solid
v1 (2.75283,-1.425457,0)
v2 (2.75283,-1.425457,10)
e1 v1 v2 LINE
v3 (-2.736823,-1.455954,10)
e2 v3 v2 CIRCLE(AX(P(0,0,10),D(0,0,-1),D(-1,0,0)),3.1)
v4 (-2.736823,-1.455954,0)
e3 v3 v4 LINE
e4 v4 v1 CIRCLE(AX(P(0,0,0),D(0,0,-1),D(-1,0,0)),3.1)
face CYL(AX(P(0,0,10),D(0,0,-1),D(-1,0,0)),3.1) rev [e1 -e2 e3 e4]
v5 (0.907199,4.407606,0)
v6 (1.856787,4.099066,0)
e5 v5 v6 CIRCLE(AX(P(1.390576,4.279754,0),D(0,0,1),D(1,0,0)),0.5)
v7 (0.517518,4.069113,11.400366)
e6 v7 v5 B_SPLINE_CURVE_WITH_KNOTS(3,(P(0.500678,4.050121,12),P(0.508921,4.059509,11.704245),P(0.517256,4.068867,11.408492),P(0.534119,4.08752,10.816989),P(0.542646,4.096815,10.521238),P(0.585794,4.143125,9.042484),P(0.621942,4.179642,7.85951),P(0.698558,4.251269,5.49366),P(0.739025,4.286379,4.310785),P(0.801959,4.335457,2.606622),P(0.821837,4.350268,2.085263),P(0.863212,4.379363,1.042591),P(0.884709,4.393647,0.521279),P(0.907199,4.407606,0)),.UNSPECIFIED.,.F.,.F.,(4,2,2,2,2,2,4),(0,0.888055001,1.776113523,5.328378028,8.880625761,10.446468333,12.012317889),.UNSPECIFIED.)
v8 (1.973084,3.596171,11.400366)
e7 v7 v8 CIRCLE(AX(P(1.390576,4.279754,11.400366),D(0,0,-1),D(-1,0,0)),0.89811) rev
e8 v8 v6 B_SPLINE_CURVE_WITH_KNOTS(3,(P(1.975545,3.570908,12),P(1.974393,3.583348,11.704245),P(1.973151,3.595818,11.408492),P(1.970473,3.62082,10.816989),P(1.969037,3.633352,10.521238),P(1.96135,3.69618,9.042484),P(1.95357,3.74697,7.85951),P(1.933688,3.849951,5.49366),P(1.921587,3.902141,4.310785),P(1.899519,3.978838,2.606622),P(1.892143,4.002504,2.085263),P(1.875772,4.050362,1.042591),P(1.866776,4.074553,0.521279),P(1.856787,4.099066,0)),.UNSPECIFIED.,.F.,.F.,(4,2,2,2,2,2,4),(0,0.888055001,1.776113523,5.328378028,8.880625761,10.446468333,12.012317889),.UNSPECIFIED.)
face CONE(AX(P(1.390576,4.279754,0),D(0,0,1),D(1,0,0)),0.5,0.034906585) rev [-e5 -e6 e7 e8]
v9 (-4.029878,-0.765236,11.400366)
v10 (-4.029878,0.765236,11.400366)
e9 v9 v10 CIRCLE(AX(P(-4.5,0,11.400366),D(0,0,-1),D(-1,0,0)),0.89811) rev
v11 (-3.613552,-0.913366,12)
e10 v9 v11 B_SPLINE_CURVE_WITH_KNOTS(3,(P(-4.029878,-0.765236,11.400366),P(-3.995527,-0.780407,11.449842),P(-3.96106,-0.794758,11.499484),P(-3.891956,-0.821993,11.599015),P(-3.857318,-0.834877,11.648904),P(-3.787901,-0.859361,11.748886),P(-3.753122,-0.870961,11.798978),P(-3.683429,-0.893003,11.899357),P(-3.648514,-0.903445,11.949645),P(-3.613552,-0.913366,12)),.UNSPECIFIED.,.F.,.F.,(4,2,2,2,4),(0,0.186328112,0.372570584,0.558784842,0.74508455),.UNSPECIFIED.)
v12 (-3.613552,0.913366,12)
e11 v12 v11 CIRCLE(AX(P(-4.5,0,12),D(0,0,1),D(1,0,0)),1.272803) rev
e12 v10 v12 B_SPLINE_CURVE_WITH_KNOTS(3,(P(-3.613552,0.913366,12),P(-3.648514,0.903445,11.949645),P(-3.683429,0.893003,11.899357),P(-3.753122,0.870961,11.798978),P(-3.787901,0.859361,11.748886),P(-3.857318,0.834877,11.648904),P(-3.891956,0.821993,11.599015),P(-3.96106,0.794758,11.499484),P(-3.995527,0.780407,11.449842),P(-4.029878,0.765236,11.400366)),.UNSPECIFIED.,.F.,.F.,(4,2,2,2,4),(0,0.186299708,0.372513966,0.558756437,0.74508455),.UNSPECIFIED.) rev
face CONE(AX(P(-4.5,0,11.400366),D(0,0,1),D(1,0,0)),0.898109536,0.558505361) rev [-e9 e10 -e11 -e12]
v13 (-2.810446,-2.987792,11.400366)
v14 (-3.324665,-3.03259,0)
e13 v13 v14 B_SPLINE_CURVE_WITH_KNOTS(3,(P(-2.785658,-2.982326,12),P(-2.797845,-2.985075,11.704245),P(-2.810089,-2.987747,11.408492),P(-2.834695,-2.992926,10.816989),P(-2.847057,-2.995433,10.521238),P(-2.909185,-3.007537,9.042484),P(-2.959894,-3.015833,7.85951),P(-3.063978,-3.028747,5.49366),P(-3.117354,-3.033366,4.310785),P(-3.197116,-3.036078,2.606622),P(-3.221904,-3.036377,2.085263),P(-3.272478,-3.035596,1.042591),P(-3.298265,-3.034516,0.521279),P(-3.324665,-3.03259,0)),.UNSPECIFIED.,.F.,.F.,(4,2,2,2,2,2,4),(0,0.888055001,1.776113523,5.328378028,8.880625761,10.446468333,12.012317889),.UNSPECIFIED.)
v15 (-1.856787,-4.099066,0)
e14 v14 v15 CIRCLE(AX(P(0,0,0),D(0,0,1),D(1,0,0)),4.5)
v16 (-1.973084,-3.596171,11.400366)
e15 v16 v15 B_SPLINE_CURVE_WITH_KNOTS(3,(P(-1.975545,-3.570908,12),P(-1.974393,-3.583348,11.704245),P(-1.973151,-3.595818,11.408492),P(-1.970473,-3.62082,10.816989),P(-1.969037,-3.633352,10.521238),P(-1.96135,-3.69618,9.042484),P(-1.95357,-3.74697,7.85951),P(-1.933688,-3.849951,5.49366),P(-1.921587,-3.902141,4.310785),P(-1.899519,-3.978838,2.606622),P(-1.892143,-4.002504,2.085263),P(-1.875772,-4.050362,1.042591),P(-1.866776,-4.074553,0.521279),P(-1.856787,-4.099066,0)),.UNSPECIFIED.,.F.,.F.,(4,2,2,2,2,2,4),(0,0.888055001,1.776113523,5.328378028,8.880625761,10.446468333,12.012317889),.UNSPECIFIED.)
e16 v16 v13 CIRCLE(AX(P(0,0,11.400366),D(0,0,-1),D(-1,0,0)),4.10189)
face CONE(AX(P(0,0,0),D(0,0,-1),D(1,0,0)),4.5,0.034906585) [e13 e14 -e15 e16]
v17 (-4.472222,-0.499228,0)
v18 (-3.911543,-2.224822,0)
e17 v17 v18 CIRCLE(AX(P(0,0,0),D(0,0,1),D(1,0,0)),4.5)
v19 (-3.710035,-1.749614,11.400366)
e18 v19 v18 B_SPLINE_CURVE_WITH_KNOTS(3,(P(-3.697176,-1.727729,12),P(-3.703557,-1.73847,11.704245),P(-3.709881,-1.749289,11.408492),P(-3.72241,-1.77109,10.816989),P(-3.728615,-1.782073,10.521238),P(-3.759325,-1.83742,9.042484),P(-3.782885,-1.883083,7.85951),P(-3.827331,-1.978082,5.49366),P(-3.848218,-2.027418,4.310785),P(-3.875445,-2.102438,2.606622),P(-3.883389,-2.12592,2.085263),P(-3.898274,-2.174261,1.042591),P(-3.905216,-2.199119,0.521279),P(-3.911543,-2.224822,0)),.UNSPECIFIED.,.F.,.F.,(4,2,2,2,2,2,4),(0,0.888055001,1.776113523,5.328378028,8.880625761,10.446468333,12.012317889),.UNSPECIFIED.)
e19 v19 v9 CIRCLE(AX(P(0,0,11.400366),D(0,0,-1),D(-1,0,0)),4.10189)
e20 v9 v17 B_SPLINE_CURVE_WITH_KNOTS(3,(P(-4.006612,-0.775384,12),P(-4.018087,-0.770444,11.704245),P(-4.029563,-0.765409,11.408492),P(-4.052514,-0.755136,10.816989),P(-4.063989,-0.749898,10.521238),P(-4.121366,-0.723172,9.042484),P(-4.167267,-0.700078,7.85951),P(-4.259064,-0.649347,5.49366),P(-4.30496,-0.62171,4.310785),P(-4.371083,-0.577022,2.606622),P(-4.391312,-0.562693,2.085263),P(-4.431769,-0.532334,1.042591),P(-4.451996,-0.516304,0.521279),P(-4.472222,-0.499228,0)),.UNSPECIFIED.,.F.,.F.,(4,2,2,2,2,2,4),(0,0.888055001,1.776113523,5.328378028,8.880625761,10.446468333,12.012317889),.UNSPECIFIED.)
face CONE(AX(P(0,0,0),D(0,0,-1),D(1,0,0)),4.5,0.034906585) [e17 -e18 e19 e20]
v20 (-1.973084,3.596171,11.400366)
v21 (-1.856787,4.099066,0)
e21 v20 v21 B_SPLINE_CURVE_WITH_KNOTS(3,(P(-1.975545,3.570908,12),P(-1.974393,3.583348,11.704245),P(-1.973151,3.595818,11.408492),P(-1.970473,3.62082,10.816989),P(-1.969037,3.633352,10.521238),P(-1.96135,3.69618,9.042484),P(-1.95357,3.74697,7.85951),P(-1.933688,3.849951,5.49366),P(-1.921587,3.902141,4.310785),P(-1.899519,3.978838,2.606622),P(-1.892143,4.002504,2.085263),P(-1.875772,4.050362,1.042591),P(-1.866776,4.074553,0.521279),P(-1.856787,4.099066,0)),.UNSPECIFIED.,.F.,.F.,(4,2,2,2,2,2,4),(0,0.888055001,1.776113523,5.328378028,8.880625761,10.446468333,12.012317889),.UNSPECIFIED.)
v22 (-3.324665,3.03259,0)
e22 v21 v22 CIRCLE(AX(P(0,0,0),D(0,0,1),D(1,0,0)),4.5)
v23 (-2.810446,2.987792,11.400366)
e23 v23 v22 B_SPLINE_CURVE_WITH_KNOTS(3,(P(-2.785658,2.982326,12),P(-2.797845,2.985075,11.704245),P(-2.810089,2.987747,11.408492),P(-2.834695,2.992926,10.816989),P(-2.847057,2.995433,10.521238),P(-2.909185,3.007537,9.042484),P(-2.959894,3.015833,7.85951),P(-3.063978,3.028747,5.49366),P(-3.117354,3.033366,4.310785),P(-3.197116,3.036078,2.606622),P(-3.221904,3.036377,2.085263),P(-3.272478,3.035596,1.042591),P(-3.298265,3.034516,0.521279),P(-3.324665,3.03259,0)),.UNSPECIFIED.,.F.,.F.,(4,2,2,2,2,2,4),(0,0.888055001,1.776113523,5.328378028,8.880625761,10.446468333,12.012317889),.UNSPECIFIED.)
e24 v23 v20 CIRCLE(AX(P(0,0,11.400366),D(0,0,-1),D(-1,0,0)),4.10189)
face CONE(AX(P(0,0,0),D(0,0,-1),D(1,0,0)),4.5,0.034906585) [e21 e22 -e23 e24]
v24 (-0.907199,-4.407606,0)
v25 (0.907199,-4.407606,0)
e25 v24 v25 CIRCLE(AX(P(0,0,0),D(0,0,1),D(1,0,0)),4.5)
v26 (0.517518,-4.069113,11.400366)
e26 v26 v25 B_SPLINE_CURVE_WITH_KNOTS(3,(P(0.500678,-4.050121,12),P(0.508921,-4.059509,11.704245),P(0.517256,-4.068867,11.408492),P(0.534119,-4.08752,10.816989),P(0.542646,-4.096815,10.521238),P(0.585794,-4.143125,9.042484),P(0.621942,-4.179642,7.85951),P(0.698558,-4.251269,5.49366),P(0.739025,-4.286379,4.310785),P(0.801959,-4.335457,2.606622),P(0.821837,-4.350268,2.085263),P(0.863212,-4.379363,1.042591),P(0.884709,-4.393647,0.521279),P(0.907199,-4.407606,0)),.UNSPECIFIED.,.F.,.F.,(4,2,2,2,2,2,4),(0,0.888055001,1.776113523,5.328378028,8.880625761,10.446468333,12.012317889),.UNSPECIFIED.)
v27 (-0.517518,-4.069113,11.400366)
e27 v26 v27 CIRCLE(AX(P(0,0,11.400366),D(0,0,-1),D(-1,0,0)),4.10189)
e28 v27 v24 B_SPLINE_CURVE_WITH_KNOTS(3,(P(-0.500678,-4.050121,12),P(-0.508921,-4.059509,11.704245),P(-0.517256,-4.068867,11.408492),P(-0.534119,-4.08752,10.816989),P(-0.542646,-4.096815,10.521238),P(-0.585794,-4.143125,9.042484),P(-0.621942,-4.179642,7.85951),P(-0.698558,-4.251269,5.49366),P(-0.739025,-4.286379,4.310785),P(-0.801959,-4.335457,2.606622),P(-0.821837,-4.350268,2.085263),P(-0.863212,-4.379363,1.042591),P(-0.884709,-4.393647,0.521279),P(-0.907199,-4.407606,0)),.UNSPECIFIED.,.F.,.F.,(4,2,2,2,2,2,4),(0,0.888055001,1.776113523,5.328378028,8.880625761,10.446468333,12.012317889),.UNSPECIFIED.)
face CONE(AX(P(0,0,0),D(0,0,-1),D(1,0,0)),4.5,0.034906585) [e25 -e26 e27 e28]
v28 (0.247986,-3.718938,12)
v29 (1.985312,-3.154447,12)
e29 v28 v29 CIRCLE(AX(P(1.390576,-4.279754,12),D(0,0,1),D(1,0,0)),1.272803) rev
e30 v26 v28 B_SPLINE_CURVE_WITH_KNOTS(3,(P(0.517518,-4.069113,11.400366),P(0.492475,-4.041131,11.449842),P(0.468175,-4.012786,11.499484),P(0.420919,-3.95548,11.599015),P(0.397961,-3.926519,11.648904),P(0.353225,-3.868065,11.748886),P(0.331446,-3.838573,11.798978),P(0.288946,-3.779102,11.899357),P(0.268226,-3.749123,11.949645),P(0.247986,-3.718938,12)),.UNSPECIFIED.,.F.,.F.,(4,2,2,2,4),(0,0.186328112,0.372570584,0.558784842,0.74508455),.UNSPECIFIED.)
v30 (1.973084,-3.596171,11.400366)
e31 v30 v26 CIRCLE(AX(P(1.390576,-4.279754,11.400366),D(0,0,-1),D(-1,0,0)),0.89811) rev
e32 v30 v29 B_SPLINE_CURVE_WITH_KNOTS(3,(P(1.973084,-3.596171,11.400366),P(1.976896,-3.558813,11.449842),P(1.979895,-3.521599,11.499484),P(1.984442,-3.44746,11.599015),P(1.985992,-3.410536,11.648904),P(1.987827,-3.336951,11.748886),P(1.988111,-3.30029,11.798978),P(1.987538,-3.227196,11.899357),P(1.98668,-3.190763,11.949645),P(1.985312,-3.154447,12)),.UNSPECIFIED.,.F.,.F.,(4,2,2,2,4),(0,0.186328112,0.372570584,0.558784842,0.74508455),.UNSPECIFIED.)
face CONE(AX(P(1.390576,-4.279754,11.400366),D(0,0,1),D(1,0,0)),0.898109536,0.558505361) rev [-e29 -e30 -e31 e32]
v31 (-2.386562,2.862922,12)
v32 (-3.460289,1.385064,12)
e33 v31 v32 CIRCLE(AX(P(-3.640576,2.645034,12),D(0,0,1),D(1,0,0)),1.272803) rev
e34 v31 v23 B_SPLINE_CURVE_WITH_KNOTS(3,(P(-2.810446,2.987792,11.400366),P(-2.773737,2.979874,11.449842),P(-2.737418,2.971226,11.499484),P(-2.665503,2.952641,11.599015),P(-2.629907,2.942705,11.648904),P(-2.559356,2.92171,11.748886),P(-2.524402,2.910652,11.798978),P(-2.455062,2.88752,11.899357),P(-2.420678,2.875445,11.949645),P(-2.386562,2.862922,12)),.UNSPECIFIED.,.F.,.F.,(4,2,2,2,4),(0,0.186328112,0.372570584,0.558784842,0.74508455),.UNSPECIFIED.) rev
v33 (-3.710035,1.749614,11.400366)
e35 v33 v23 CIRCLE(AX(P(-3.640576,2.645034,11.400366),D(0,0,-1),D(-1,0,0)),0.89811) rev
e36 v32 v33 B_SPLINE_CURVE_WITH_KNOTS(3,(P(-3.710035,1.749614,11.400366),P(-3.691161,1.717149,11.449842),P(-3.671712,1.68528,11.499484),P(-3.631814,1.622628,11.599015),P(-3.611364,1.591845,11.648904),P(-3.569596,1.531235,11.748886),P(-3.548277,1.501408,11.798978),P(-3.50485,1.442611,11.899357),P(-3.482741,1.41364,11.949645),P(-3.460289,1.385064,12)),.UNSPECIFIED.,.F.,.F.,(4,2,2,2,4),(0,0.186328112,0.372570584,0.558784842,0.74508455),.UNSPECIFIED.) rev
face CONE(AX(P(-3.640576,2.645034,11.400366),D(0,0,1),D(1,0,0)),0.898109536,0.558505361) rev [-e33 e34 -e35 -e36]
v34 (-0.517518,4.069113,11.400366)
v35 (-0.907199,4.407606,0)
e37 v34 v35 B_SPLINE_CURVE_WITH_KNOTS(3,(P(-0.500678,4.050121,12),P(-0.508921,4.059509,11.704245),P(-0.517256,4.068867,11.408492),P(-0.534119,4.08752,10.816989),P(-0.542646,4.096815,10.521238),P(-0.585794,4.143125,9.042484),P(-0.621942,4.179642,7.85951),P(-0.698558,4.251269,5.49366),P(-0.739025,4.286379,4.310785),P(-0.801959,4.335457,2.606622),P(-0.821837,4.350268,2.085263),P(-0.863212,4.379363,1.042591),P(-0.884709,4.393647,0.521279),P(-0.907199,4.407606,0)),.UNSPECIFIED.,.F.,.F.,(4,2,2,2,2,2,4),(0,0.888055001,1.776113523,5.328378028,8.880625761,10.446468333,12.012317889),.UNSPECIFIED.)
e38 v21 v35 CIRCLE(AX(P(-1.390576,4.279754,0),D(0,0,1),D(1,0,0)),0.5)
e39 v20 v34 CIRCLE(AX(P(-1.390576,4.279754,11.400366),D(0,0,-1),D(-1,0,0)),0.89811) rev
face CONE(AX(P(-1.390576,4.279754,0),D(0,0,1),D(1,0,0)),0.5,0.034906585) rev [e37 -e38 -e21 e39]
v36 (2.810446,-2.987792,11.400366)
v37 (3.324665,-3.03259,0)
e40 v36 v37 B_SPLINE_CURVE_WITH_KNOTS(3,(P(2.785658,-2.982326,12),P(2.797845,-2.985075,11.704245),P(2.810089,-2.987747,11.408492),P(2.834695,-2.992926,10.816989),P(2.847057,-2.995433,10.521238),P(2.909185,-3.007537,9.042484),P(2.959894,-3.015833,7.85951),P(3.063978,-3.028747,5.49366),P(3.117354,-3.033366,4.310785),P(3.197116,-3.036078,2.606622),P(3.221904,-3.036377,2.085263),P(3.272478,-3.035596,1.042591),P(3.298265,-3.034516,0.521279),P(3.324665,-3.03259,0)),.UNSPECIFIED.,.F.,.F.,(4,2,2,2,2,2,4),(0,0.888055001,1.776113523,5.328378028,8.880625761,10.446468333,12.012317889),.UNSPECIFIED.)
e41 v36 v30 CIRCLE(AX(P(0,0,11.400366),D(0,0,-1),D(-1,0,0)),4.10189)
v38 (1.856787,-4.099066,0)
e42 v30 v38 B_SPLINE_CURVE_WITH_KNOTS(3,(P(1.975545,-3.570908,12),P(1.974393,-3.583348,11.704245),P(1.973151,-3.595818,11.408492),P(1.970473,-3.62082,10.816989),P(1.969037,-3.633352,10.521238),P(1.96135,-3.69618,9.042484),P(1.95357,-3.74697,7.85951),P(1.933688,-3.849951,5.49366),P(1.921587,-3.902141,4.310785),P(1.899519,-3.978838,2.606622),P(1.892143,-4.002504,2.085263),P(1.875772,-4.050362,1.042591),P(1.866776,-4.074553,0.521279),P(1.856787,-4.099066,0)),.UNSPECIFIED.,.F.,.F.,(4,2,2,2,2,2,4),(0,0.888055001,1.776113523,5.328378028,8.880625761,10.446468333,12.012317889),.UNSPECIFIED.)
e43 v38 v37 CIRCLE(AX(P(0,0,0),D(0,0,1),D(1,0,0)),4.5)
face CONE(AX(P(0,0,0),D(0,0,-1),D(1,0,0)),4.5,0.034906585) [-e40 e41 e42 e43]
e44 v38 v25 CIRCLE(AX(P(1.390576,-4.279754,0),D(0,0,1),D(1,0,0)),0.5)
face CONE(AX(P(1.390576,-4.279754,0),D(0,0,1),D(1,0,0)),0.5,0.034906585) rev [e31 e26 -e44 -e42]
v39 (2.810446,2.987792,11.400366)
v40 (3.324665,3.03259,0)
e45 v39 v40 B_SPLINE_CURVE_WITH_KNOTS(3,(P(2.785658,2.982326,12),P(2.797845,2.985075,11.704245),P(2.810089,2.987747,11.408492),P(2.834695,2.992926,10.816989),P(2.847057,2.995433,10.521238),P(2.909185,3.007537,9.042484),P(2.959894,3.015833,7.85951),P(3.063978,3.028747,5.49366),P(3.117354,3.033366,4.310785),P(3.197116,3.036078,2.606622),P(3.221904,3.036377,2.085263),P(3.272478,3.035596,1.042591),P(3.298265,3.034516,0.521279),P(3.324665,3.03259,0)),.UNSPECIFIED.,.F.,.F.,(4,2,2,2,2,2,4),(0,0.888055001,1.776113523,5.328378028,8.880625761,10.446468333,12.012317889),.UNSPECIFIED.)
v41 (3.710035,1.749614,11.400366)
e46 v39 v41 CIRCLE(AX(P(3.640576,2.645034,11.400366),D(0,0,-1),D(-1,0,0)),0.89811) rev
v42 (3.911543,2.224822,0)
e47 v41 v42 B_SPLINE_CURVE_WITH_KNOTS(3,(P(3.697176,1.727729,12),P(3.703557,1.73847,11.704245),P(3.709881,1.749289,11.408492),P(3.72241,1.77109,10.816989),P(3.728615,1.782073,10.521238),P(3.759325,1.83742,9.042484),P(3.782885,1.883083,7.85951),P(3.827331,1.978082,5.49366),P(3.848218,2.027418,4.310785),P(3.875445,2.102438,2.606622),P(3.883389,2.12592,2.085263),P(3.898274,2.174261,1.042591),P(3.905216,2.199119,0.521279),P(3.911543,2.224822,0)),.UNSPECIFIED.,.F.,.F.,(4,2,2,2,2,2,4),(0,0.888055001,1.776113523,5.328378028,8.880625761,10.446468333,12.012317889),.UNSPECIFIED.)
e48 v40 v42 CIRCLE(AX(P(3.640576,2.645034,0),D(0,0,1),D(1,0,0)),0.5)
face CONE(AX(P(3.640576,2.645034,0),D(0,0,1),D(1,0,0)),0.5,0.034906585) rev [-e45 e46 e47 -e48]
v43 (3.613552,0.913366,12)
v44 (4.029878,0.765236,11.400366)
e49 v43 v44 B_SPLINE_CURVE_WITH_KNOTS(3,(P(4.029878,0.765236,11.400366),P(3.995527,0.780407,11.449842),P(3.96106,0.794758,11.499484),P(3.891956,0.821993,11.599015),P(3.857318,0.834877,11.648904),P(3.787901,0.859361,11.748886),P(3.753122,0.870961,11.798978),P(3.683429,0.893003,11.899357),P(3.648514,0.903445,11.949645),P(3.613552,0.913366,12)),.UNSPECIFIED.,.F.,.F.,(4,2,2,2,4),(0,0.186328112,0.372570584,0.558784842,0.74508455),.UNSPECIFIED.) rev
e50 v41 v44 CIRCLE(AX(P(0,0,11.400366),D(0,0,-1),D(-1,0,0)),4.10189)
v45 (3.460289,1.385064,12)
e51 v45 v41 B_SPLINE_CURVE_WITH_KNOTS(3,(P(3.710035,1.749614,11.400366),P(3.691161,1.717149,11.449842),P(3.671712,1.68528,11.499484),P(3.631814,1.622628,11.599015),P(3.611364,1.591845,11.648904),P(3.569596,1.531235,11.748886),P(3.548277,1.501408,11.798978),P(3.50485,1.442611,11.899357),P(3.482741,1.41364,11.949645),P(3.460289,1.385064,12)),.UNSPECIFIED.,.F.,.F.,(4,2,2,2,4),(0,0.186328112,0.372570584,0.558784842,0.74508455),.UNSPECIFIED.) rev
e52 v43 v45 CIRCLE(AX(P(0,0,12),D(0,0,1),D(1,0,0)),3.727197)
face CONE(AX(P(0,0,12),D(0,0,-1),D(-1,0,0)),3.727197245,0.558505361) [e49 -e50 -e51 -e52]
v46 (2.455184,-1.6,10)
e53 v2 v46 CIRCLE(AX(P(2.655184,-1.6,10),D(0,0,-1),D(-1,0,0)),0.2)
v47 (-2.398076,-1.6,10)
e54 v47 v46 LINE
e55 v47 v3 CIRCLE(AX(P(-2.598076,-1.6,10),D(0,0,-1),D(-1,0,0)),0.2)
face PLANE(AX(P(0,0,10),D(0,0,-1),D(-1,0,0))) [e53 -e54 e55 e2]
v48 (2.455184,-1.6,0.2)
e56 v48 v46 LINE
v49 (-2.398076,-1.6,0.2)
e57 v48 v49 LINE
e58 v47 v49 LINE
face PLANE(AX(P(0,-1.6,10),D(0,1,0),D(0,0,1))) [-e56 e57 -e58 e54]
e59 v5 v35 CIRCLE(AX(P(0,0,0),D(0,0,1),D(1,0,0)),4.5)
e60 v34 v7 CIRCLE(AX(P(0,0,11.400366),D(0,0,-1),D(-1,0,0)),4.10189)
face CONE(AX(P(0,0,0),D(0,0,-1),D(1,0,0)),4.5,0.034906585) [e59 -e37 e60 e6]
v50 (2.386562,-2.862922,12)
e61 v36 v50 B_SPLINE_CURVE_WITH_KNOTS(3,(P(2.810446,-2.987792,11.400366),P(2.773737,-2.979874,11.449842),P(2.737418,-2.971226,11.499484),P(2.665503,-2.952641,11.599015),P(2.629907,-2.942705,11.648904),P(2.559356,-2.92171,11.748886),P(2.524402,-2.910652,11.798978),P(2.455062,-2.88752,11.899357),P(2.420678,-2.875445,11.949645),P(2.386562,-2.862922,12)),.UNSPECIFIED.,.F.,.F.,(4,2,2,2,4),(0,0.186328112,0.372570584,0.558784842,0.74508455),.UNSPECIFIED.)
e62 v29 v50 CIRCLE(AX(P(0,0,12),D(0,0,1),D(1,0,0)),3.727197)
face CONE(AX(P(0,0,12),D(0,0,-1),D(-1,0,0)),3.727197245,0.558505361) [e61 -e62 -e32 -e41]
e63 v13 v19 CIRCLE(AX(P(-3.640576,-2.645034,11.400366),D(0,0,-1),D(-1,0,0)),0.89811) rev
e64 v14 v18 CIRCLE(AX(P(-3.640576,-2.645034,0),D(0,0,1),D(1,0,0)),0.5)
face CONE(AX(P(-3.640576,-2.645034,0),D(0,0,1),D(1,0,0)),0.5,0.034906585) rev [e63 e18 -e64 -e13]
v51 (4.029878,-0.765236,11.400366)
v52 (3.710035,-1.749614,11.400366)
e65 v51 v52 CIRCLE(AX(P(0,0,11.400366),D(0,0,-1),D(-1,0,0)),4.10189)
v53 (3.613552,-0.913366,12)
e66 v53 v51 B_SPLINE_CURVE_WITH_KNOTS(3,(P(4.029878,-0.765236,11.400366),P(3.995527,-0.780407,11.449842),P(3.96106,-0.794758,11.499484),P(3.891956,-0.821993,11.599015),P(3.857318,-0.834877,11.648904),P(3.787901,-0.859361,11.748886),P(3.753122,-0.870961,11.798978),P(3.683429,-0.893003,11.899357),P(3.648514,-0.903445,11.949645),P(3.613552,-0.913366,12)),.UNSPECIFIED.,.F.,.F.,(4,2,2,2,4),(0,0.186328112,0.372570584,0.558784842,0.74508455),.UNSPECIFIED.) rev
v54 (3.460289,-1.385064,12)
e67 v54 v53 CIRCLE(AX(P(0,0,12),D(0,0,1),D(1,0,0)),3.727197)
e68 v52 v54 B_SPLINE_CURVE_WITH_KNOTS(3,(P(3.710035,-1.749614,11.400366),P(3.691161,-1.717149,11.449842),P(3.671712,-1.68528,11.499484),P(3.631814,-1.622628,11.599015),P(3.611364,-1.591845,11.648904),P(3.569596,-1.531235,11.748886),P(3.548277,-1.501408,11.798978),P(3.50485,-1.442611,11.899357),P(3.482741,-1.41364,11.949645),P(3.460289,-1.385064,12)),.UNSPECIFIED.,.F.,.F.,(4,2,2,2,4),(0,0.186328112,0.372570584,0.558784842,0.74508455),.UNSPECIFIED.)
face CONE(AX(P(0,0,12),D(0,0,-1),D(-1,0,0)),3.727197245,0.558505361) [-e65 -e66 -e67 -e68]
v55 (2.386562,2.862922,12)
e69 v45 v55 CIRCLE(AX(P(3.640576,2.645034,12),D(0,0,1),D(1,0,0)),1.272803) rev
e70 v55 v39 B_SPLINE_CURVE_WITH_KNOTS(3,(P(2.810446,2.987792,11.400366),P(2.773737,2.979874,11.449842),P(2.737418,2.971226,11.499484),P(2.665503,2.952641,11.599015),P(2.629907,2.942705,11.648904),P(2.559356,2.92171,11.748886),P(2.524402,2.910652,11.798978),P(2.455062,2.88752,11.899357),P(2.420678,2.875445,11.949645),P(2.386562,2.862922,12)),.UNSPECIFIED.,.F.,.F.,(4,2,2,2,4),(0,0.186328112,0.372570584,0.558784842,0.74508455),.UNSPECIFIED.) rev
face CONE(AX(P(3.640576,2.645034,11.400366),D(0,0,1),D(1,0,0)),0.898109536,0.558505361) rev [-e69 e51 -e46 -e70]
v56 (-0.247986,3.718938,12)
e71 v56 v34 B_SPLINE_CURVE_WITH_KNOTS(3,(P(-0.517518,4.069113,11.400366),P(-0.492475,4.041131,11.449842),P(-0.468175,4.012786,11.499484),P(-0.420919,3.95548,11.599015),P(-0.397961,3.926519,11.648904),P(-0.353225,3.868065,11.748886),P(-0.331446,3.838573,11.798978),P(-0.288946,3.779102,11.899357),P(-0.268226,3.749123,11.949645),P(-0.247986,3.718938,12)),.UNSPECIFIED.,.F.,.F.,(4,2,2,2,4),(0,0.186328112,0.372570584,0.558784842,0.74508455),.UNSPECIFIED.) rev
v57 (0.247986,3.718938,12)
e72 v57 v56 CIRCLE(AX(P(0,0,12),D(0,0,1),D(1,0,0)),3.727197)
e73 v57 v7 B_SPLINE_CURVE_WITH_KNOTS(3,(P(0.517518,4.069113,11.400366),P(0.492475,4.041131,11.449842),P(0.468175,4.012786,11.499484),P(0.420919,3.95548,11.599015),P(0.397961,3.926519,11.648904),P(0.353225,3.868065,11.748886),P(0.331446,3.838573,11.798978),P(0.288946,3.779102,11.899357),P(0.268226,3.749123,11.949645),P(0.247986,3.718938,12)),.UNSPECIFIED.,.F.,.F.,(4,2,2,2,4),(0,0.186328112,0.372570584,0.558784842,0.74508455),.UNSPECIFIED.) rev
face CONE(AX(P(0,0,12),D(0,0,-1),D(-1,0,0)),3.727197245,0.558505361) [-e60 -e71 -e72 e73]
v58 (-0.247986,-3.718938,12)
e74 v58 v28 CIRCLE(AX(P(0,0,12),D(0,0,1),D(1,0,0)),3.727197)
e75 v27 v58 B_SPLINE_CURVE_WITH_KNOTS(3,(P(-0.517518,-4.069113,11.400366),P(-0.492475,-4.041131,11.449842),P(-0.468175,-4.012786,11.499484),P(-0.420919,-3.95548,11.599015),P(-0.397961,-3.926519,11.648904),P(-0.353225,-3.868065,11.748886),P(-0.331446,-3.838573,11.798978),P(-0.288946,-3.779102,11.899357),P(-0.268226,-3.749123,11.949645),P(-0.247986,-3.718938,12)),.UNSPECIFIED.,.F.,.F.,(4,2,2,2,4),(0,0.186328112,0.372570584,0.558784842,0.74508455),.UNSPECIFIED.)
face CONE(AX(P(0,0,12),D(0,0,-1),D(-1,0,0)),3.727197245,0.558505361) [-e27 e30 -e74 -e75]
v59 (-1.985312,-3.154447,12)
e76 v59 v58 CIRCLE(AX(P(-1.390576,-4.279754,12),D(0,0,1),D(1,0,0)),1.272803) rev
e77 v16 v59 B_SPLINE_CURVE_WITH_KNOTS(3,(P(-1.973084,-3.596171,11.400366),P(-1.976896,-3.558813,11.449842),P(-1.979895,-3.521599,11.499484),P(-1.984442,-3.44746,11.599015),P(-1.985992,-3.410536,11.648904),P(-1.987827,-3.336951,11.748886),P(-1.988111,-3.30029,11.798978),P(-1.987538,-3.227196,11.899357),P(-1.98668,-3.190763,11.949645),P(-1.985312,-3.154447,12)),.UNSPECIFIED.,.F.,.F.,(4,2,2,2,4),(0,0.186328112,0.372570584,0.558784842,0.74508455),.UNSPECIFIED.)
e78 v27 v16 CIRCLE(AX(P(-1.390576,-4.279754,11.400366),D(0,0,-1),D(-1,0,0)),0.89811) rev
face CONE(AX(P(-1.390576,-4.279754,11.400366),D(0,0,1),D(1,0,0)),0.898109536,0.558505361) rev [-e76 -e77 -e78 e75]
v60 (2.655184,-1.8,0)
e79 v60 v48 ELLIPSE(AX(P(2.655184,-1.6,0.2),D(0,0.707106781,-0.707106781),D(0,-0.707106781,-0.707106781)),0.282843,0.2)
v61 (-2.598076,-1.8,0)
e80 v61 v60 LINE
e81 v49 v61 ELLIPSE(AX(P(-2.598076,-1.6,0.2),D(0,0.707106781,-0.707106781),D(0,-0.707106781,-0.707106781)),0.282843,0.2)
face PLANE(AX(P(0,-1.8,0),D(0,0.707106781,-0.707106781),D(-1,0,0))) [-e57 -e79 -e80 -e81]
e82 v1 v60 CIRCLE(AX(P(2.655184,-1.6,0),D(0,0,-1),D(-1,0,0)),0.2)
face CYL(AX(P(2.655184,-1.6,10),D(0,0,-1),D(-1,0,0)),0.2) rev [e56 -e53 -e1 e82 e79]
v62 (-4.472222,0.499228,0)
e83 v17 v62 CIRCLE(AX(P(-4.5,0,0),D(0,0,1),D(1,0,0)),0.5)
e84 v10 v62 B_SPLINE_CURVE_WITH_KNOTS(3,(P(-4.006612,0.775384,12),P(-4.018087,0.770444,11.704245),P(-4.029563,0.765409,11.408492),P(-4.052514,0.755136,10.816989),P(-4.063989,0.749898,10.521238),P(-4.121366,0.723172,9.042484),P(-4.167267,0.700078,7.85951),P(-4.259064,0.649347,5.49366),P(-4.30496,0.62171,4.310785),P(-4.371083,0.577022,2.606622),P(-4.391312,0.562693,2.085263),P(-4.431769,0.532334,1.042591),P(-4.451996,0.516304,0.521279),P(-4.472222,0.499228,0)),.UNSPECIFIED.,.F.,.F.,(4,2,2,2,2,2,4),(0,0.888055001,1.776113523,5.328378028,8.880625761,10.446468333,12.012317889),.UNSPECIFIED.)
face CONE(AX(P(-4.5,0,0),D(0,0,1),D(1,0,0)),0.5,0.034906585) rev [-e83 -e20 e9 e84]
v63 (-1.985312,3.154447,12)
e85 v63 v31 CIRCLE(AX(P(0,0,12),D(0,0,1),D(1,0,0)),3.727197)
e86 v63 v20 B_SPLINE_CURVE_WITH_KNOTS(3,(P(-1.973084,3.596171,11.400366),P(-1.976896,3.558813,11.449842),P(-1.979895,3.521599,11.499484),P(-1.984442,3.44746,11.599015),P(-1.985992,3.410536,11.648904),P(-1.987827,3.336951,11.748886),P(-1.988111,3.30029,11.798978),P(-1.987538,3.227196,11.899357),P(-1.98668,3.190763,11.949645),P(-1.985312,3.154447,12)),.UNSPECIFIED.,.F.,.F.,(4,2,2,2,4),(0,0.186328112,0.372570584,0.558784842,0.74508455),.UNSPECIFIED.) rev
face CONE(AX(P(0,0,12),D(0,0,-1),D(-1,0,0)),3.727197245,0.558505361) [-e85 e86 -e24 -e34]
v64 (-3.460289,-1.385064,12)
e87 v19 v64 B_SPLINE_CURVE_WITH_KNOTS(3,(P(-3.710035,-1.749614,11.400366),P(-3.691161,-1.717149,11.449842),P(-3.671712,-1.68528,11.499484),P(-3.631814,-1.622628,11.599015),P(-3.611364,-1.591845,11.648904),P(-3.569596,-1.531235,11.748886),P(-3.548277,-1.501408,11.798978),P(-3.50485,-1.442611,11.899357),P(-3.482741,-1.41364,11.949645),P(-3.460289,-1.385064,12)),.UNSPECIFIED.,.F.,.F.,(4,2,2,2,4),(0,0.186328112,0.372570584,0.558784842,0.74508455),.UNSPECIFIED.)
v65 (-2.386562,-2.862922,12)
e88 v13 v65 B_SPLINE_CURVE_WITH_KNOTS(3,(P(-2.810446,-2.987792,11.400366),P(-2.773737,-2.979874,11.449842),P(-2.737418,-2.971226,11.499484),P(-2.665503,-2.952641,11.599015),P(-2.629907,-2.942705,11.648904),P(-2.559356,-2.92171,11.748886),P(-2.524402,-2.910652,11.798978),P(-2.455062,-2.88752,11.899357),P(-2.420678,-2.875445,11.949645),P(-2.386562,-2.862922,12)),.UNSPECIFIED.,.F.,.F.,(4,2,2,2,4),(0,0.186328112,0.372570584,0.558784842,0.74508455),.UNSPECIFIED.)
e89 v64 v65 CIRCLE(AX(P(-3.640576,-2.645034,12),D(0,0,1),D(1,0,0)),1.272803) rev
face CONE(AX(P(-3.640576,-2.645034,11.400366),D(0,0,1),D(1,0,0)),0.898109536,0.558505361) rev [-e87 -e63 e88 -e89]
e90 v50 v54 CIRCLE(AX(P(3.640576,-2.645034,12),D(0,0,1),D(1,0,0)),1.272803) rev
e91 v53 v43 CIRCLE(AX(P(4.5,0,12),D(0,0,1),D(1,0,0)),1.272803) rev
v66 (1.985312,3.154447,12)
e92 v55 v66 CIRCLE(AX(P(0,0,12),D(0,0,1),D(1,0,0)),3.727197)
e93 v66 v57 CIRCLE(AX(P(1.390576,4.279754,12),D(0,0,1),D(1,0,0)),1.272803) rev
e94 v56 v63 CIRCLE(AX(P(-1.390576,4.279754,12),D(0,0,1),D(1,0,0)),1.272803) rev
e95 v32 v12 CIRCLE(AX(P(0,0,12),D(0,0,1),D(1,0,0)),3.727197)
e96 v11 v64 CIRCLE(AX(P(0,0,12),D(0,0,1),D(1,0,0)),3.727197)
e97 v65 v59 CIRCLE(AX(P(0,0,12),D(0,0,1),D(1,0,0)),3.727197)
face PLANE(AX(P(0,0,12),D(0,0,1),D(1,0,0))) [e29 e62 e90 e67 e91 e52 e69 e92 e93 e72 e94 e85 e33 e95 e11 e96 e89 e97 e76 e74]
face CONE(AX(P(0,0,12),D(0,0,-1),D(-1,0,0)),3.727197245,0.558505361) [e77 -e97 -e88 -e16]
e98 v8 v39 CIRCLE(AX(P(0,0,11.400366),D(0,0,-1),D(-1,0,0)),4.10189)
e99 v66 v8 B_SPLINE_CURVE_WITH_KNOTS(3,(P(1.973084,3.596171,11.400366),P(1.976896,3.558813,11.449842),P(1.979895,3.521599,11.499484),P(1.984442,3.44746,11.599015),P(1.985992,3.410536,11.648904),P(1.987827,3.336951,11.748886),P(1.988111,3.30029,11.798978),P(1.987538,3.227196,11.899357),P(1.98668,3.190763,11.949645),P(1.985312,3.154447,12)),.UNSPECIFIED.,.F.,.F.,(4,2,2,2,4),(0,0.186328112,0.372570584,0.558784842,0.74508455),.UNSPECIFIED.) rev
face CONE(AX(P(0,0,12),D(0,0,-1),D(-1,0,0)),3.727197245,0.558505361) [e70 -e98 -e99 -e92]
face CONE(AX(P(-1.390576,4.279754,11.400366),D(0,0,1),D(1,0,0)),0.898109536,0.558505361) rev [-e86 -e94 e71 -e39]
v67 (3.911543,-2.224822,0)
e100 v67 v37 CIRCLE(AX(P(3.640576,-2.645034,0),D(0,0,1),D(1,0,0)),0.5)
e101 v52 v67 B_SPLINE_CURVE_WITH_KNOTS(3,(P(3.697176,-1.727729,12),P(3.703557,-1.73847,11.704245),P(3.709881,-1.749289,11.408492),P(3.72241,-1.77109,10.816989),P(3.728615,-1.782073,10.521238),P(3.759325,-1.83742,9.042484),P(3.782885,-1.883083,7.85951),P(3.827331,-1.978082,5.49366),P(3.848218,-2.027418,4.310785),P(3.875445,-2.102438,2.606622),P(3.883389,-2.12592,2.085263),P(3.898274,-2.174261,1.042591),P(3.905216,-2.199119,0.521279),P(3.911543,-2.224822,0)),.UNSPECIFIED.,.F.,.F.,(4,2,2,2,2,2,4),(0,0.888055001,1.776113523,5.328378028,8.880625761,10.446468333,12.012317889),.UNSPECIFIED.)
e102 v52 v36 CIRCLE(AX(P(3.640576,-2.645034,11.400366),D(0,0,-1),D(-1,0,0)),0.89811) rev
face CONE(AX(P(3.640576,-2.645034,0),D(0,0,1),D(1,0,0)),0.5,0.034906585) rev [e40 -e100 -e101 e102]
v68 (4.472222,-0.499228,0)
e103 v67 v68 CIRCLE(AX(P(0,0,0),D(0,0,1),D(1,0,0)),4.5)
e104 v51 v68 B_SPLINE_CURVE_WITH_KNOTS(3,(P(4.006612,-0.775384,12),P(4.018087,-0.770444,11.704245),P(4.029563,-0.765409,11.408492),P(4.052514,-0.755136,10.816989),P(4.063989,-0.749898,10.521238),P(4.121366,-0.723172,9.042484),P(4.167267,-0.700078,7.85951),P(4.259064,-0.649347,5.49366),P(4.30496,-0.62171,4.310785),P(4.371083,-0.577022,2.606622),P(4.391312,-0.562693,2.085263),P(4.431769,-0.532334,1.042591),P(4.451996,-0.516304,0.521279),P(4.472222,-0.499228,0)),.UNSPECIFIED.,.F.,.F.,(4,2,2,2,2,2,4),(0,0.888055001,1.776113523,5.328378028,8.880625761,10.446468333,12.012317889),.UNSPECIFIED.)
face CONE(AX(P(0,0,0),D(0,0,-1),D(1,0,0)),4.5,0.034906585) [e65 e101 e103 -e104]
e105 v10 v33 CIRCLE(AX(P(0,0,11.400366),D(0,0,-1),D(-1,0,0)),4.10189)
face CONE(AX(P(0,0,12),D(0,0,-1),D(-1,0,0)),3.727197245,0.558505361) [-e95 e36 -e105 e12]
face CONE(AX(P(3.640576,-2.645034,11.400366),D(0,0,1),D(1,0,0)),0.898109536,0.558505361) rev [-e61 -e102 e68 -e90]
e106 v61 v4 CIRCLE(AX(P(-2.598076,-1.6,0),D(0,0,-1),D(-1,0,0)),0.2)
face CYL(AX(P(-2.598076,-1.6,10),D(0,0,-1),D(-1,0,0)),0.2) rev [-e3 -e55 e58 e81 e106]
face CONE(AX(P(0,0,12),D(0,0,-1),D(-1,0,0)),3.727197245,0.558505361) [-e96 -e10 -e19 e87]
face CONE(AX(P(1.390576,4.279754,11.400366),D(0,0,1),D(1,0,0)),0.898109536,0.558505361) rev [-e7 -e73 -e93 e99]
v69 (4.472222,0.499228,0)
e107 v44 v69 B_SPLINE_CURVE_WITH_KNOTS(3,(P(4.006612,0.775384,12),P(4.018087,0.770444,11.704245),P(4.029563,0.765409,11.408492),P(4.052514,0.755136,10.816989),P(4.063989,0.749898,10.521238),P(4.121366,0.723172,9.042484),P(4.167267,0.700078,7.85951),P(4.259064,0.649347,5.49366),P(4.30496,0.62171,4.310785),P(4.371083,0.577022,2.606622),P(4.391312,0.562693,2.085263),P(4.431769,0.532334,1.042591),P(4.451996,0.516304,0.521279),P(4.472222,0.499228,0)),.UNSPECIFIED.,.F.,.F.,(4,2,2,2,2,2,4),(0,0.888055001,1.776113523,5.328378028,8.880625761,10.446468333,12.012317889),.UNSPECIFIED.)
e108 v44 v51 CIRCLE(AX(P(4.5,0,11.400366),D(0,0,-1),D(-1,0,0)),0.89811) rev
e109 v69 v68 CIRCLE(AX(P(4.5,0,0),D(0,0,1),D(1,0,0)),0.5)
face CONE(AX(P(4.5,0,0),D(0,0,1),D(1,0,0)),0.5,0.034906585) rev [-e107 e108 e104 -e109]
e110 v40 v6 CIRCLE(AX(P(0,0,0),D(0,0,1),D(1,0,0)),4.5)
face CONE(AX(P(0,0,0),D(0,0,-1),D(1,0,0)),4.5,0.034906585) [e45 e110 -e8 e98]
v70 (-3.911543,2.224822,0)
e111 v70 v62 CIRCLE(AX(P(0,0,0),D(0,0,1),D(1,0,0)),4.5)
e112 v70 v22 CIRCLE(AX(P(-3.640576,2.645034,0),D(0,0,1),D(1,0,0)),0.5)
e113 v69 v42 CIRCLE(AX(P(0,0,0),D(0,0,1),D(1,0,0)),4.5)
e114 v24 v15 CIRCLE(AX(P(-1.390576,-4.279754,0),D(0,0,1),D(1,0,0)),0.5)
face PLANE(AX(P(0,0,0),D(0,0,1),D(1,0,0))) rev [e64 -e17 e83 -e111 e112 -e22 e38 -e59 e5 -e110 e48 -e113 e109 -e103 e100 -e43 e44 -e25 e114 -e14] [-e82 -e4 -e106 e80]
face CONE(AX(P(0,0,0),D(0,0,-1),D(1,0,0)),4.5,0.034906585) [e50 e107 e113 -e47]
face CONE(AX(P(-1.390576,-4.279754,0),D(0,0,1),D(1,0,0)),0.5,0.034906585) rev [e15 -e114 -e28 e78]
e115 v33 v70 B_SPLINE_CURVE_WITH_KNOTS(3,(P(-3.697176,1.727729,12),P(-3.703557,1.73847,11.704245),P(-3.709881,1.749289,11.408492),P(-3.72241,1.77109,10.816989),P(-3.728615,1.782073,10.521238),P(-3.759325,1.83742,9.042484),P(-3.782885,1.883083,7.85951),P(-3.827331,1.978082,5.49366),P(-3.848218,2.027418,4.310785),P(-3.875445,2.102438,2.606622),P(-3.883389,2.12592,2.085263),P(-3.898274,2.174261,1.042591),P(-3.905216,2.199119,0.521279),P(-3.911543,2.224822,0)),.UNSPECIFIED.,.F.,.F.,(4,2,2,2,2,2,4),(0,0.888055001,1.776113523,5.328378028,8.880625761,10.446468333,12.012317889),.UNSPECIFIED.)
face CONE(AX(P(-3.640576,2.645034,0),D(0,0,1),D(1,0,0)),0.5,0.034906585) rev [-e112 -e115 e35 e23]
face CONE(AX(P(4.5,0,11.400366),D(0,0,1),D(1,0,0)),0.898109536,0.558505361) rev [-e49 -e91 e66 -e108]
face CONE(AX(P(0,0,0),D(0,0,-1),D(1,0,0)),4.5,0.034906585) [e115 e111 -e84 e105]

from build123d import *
from OCP.BRepFilletAPI import BRepFilletAPI_MakeChamfer

# Parameters (mm, degrees)
BOSS_EXTRU_1_DEPTH      = 12
BOSS_EXTRU_1_TAPER      = 2
CHANFREIN2_SIZE         = 0.6
CHANFREIN2_SIZE2        = 0.353753521
ENL_V_MAT_EXTRU_1_DEPTH = 10
ESQUISSE4_R             = 0.2
ENL_V_MAT_EXTRU_4_DEPTH = 10
CHANFREIN3_SIZE         = 0.2


with BuildPart() as part:
    # Esquisse1 → Boss.-Extru.1 (new body)
    with BuildSketch(Plane.XY):
        with BuildLine():
            ThreePointArc((4.472222222, -0.499227799), (4, 0), (4.472222222, 0.499227799))
            ThreePointArc((4.472222222, 0.499227799), (4.279754323, 1.390576475), (3.911542518, 2.224822494))
            ThreePointArc((3.911542518, 2.224822494), (3.236067977, 2.351141009), (3.324665043, 3.03259004))
            ThreePointArc((3.324665043, 3.03259004), (2.645033635, 3.640576475), (1.85678652, 4.099066213))
            ThreePointArc((1.85678652, 4.099066213), (1.236067977, 3.804226065), (0.907198818, 4.407605961))
            ThreePointArc((0.907198818, 4.407605961), (0, 4.5), (-0.907198818, 4.407605961))
            ThreePointArc((-0.907198818, 4.407605961), (-1.236067977, 3.804226065), (-1.85678652, 4.099066213))
            ThreePointArc((-1.85678652, 4.099066213), (-2.645033635, 3.640576475), (-3.324665043, 3.03259004))
            ThreePointArc((-3.324665043, 3.03259004), (-3.236067977, 2.351141009), (-3.911542518, 2.224822494))
            ThreePointArc((-3.911542518, 2.224822494), (-4.279754323, 1.390576475), (-4.472222222, 0.499227799))
            ThreePointArc((-4.472222222, 0.499227799), (-4, 0), (-4.472222222, -0.499227799))
            ThreePointArc((-4.472222222, -0.499227799), (-4.279754323, -1.390576475), (-3.911542518, -2.224822494))
            ThreePointArc((-3.911542518, -2.224822494), (-3.236067977, -2.351141009), (-3.324665043, -3.03259004))
            ThreePointArc((-3.324665043, -3.03259004), (-2.645033635, -3.640576475), (-1.85678652, -4.099066213))
            ThreePointArc((-1.85678652, -4.099066213), (-1.236067977, -3.804226065), (-0.907198818, -4.407605961))
            ThreePointArc((-0.907198818, -4.407605961), (0, -4.5), (0.907198818, -4.407605961))
            ThreePointArc((0.907198818, -4.407605961), (1.236067977, -3.804226065), (1.85678652, -4.099066213))
            ThreePointArc((1.85678652, -4.099066213), (2.645033635, -3.640576475), (3.324665043, -3.03259004))
            ThreePointArc((3.324665043, -3.03259004), (3.236067977, -2.351141009), (3.911542518, -2.224822494))
            ThreePointArc((3.911542518, -2.224822494), (4.279754323, -1.390576475), (4.472222222, -0.499227799))
        make_face()
    extrude(amount=BOSS_EXTRU_1_DEPTH, taper=BOSS_EXTRU_1_TAPER)

    # Chanfrein2: one chamfer whose edges measure the first distance from different faces: ONE call of the kernel's chamfer builder (chamfer() names one face for all edges)
    chanfrein2_edges_1 = [part.edges().sort_by_distance(p)[0] for p in [
        (-3.881214819, 1.26108314, 12),
    ]]
    chanfrein2_side_1 = [part.faces().sort_by_distance(p)[0] for p in [
        (-4.080484571, 1.325829807, 6),
    ]]
    chanfrein2_edges_2 = [part.edges().sort_by_distance(p)[0] for p in [
        (-2.897050026, 2.104830049, 12),
    ]]
    chanfrein2_side_2 = [part.faces().sort_by_distance(p)[0] for p in [
        (-3.066559002, 2.227985529, 6),
    ]]
    chanfrein2_edges_3 = [part.edges().sort_by_distance(p)[0] for p in [
        (-2.398722676, 3.301558523, 12),
    ]]
    chanfrein2_side_3 = [part.faces().sort_by_distance(p)[0] for p in [
        (-2.521878155, 3.471067499, 6),
    ]]
    chanfrein2_edges_4 = [part.edges().sort_by_distance(p)[0] for p in [
        (-1.106574643, 3.405686561, 12),
    ]]
    chanfrein2_side_4 = [part.faces().sort_by_distance(p)[0] for p in [
        (-1.17132131, 3.604956313, 6),
    ]]
    chanfrein2_edges_5 = [part.edges().sort_by_distance(p)[0] for p in [
        (0, 4.080950766, 12),
    ]]
    chanfrein2_side_5 = [part.faces().sort_by_distance(p)[0] for p in [
        (0, 4.290475383, 6),
    ]]
    chanfrein2_edges_6 = [part.edges().sort_by_distance(p)[0] for p in [
        (1.106574643, 3.405686561, 12),
    ]]
    chanfrein2_side_6 = [part.faces().sort_by_distance(p)[0] for p in [
        (1.17132131, 3.604956313, 6),
    ]]
    chanfrein2_edges_7 = [part.edges().sort_by_distance(p)[0] for p in [
        (2.398722676, 3.301558523, 12),
    ]]
    chanfrein2_side_7 = [part.faces().sort_by_distance(p)[0] for p in [
        (2.521878155, 3.471067499, 6),
    ]]
    chanfrein2_edges_8 = [part.edges().sort_by_distance(p)[0] for p in [
        (2.897050026, 2.104830049, 12),
    ]]
    chanfrein2_side_8 = [part.faces().sort_by_distance(p)[0] for p in [
        (3.066559002, 2.227985529, 6),
    ]]
    chanfrein2_edges_9 = [part.edges().sort_by_distance(p)[0] for p in [
        (3.881214819, 1.26108314, 12),
    ]]
    chanfrein2_side_9 = [part.faces().sort_by_distance(p)[0] for p in [
        (4.080484571, 1.325829807, 6),
    ]]
    chanfrein2_edges_10 = [part.edges().sort_by_distance(p)[0] for p in [
        (3.580950766, 0, 12),
    ]]
    chanfrein2_side_10 = [part.faces().sort_by_distance(p)[0] for p in [
        (3.790475383, 0, 6),
    ]]
    chanfrein2_edges_11 = [part.edges().sort_by_distance(p)[0] for p in [
        (3.881214819, -1.26108314, 12),
    ]]
    chanfrein2_side_11 = [part.faces().sort_by_distance(p)[0] for p in [
        (4.080484571, -1.325829807, 6),
    ]]
    chanfrein2_edges_12 = [part.edges().sort_by_distance(p)[0] for p in [
        (2.897050026, -2.104830049, 12),
    ]]
    chanfrein2_side_12 = [part.faces().sort_by_distance(p)[0] for p in [
        (3.066559002, -2.227985529, 6),
    ]]
    chanfrein2_edges_13 = [part.edges().sort_by_distance(p)[0] for p in [
        (2.398722676, -3.301558523, 12),
    ]]
    chanfrein2_side_13 = [part.faces().sort_by_distance(p)[0] for p in [
        (2.521878155, -3.471067499, 6),
    ]]
    chanfrein2_edges_14 = [part.edges().sort_by_distance(p)[0] for p in [
        (1.106574643, -3.405686561, 12),
    ]]
    chanfrein2_side_14 = [part.faces().sort_by_distance(p)[0] for p in [
        (1.17132131, -3.604956313, 6),
    ]]
    chanfrein2_edges_15 = [part.edges().sort_by_distance(p)[0] for p in [
        (0, -4.080950766, 12),
    ]]
    chanfrein2_side_15 = [part.faces().sort_by_distance(p)[0] for p in [
        (0, -4.290475383, 6),
    ]]
    chanfrein2_edges_16 = [part.edges().sort_by_distance(p)[0] for p in [
        (-1.106574643, -3.405686561, 12),
    ]]
    chanfrein2_side_16 = [part.faces().sort_by_distance(p)[0] for p in [
        (-1.17132131, -3.604956313, 6),
    ]]
    chanfrein2_edges_17 = [part.edges().sort_by_distance(p)[0] for p in [
        (-2.398722676, -3.301558523, 12),
    ]]
    chanfrein2_side_17 = [part.faces().sort_by_distance(p)[0] for p in [
        (-2.521878155, -3.471067499, 6),
    ]]
    chanfrein2_edges_18 = [part.edges().sort_by_distance(p)[0] for p in [
        (-2.897050026, -2.104830049, 12),
    ]]
    chanfrein2_side_18 = [part.faces().sort_by_distance(p)[0] for p in [
        (-3.066559002, -2.227985529, 6),
    ]]
    chanfrein2_edges_19 = [part.edges().sort_by_distance(p)[0] for p in [
        (-3.881214819, -1.26108314, 12),
    ]]
    chanfrein2_side_19 = [part.faces().sort_by_distance(p)[0] for p in [
        (-4.080484571, -1.325829807, 6),
    ]]
    chanfrein2_edges_20 = [part.edges().sort_by_distance(p)[0] for p in [
        (-3.580950766, 0, 12),
    ]]
    chanfrein2_side_20 = [part.faces().sort_by_distance(p)[0] for p in [
        (-3.790475383, 0, 6),
    ]]
    chanfrein2 = BRepFilletAPI_MakeChamfer(part.part.solid().wrapped)
    for e in chanfrein2_edges_1:
        chanfrein2.Add(CHANFREIN2_SIZE, CHANFREIN2_SIZE2, e.wrapped, chanfrein2_side_1[0].wrapped)  # the first distance lies on this face
    for e in chanfrein2_edges_2:
        chanfrein2.Add(CHANFREIN2_SIZE, CHANFREIN2_SIZE2, e.wrapped, chanfrein2_side_2[0].wrapped)  # the first distance lies on this face
    for e in chanfrein2_edges_3:
        chanfrein2.Add(CHANFREIN2_SIZE, CHANFREIN2_SIZE2, e.wrapped, chanfrein2_side_3[0].wrapped)  # the first distance lies on this face
    for e in chanfrein2_edges_4:
        chanfrein2.Add(CHANFREIN2_SIZE, CHANFREIN2_SIZE2, e.wrapped, chanfrein2_side_4[0].wrapped)  # the first distance lies on this face
    for e in chanfrein2_edges_5:
        chanfrein2.Add(CHANFREIN2_SIZE, CHANFREIN2_SIZE2, e.wrapped, chanfrein2_side_5[0].wrapped)  # the first distance lies on this face
    for e in chanfrein2_edges_6:
        chanfrein2.Add(CHANFREIN2_SIZE, CHANFREIN2_SIZE2, e.wrapped, chanfrein2_side_6[0].wrapped)  # the first distance lies on this face
    for e in chanfrein2_edges_7:
        chanfrein2.Add(CHANFREIN2_SIZE, CHANFREIN2_SIZE2, e.wrapped, chanfrein2_side_7[0].wrapped)  # the first distance lies on this face
    for e in chanfrein2_edges_8:
        chanfrein2.Add(CHANFREIN2_SIZE, CHANFREIN2_SIZE2, e.wrapped, chanfrein2_side_8[0].wrapped)  # the first distance lies on this face
    for e in chanfrein2_edges_9:
        chanfrein2.Add(CHANFREIN2_SIZE, CHANFREIN2_SIZE2, e.wrapped, chanfrein2_side_9[0].wrapped)  # the first distance lies on this face
    for e in chanfrein2_edges_10:
        chanfrein2.Add(CHANFREIN2_SIZE, CHANFREIN2_SIZE2, e.wrapped, chanfrein2_side_10[0].wrapped)  # the first distance lies on this face
    for e in chanfrein2_edges_11:
        chanfrein2.Add(CHANFREIN2_SIZE, CHANFREIN2_SIZE2, e.wrapped, chanfrein2_side_11[0].wrapped)  # the first distance lies on this face
    for e in chanfrein2_edges_12:
        chanfrein2.Add(CHANFREIN2_SIZE, CHANFREIN2_SIZE2, e.wrapped, chanfrein2_side_12[0].wrapped)  # the first distance lies on this face
    for e in chanfrein2_edges_13:
        chanfrein2.Add(CHANFREIN2_SIZE, CHANFREIN2_SIZE2, e.wrapped, chanfrein2_side_13[0].wrapped)  # the first distance lies on this face
    for e in chanfrein2_edges_14:
        chanfrein2.Add(CHANFREIN2_SIZE, CHANFREIN2_SIZE2, e.wrapped, chanfrein2_side_14[0].wrapped)  # the first distance lies on this face
    for e in chanfrein2_edges_15:
        chanfrein2.Add(CHANFREIN2_SIZE, CHANFREIN2_SIZE2, e.wrapped, chanfrein2_side_15[0].wrapped)  # the first distance lies on this face
    for e in chanfrein2_edges_16:
        chanfrein2.Add(CHANFREIN2_SIZE, CHANFREIN2_SIZE2, e.wrapped, chanfrein2_side_16[0].wrapped)  # the first distance lies on this face
    for e in chanfrein2_edges_17:
        chanfrein2.Add(CHANFREIN2_SIZE, CHANFREIN2_SIZE2, e.wrapped, chanfrein2_side_17[0].wrapped)  # the first distance lies on this face
    for e in chanfrein2_edges_18:
        chanfrein2.Add(CHANFREIN2_SIZE, CHANFREIN2_SIZE2, e.wrapped, chanfrein2_side_18[0].wrapped)  # the first distance lies on this face
    for e in chanfrein2_edges_19:
        chanfrein2.Add(CHANFREIN2_SIZE, CHANFREIN2_SIZE2, e.wrapped, chanfrein2_side_19[0].wrapped)  # the first distance lies on this face
    for e in chanfrein2_edges_20:
        chanfrein2.Add(CHANFREIN2_SIZE, CHANFREIN2_SIZE2, e.wrapped, chanfrein2_side_20[0].wrapped)  # the first distance lies on this face
    add(Compound.cast(chanfrein2.Shape()), mode=Mode.REPLACE)

    # Esquisse2 → Enlèv. mat.-Extru.1 (cut)
    with BuildSketch(Plane(origin=(0, 0, 0), x_dir=(-1, 0, 0), z_dir=(0, 0, -1))):
        with BuildLine():
            Line((-2.655183609, -1.6), (2.655183609, -1.6))
            ThreePointArc((2.655183609, -1.6), (2.986726401, -0.830340536), (3.1, 0))
            ThreePointArc((3.1, 0), (-0.830340536, 2.986726401), (-2.655183609, -1.6))
        make_face()
    extrude(amount=-ENL_V_MAT_EXTRU_1_DEPTH, mode=Mode.SUBTRACT)

    # Esquisse4 → Enlèv. mat.-Extru.4 (cut)
    with BuildSketch(Plane(origin=(0, 0, 0), x_dir=(-1, 0, 0), z_dir=(0, 0, -1))):
        with Locations((-2.655183609, -1.6)):
            Circle(ESQUISSE4_R)
        with Locations((2.598076211, -1.6)):
            Circle(ESQUISSE4_R)
    extrude(amount=-ENL_V_MAT_EXTRU_4_DEPTH, mode=Mode.SUBTRACT)

    # Chanfrein3
    chanfrein3_edges = [part.edges().sort_by_distance(p)[0] for p in [
        (0.028553699, -1.6, 0),
    ]]
    chamfer(chanfrein3_edges, length=CHANFREIN3_SIZE - 0.0001)  # a hair under: the kernel refuses the full size


solid = part.part
